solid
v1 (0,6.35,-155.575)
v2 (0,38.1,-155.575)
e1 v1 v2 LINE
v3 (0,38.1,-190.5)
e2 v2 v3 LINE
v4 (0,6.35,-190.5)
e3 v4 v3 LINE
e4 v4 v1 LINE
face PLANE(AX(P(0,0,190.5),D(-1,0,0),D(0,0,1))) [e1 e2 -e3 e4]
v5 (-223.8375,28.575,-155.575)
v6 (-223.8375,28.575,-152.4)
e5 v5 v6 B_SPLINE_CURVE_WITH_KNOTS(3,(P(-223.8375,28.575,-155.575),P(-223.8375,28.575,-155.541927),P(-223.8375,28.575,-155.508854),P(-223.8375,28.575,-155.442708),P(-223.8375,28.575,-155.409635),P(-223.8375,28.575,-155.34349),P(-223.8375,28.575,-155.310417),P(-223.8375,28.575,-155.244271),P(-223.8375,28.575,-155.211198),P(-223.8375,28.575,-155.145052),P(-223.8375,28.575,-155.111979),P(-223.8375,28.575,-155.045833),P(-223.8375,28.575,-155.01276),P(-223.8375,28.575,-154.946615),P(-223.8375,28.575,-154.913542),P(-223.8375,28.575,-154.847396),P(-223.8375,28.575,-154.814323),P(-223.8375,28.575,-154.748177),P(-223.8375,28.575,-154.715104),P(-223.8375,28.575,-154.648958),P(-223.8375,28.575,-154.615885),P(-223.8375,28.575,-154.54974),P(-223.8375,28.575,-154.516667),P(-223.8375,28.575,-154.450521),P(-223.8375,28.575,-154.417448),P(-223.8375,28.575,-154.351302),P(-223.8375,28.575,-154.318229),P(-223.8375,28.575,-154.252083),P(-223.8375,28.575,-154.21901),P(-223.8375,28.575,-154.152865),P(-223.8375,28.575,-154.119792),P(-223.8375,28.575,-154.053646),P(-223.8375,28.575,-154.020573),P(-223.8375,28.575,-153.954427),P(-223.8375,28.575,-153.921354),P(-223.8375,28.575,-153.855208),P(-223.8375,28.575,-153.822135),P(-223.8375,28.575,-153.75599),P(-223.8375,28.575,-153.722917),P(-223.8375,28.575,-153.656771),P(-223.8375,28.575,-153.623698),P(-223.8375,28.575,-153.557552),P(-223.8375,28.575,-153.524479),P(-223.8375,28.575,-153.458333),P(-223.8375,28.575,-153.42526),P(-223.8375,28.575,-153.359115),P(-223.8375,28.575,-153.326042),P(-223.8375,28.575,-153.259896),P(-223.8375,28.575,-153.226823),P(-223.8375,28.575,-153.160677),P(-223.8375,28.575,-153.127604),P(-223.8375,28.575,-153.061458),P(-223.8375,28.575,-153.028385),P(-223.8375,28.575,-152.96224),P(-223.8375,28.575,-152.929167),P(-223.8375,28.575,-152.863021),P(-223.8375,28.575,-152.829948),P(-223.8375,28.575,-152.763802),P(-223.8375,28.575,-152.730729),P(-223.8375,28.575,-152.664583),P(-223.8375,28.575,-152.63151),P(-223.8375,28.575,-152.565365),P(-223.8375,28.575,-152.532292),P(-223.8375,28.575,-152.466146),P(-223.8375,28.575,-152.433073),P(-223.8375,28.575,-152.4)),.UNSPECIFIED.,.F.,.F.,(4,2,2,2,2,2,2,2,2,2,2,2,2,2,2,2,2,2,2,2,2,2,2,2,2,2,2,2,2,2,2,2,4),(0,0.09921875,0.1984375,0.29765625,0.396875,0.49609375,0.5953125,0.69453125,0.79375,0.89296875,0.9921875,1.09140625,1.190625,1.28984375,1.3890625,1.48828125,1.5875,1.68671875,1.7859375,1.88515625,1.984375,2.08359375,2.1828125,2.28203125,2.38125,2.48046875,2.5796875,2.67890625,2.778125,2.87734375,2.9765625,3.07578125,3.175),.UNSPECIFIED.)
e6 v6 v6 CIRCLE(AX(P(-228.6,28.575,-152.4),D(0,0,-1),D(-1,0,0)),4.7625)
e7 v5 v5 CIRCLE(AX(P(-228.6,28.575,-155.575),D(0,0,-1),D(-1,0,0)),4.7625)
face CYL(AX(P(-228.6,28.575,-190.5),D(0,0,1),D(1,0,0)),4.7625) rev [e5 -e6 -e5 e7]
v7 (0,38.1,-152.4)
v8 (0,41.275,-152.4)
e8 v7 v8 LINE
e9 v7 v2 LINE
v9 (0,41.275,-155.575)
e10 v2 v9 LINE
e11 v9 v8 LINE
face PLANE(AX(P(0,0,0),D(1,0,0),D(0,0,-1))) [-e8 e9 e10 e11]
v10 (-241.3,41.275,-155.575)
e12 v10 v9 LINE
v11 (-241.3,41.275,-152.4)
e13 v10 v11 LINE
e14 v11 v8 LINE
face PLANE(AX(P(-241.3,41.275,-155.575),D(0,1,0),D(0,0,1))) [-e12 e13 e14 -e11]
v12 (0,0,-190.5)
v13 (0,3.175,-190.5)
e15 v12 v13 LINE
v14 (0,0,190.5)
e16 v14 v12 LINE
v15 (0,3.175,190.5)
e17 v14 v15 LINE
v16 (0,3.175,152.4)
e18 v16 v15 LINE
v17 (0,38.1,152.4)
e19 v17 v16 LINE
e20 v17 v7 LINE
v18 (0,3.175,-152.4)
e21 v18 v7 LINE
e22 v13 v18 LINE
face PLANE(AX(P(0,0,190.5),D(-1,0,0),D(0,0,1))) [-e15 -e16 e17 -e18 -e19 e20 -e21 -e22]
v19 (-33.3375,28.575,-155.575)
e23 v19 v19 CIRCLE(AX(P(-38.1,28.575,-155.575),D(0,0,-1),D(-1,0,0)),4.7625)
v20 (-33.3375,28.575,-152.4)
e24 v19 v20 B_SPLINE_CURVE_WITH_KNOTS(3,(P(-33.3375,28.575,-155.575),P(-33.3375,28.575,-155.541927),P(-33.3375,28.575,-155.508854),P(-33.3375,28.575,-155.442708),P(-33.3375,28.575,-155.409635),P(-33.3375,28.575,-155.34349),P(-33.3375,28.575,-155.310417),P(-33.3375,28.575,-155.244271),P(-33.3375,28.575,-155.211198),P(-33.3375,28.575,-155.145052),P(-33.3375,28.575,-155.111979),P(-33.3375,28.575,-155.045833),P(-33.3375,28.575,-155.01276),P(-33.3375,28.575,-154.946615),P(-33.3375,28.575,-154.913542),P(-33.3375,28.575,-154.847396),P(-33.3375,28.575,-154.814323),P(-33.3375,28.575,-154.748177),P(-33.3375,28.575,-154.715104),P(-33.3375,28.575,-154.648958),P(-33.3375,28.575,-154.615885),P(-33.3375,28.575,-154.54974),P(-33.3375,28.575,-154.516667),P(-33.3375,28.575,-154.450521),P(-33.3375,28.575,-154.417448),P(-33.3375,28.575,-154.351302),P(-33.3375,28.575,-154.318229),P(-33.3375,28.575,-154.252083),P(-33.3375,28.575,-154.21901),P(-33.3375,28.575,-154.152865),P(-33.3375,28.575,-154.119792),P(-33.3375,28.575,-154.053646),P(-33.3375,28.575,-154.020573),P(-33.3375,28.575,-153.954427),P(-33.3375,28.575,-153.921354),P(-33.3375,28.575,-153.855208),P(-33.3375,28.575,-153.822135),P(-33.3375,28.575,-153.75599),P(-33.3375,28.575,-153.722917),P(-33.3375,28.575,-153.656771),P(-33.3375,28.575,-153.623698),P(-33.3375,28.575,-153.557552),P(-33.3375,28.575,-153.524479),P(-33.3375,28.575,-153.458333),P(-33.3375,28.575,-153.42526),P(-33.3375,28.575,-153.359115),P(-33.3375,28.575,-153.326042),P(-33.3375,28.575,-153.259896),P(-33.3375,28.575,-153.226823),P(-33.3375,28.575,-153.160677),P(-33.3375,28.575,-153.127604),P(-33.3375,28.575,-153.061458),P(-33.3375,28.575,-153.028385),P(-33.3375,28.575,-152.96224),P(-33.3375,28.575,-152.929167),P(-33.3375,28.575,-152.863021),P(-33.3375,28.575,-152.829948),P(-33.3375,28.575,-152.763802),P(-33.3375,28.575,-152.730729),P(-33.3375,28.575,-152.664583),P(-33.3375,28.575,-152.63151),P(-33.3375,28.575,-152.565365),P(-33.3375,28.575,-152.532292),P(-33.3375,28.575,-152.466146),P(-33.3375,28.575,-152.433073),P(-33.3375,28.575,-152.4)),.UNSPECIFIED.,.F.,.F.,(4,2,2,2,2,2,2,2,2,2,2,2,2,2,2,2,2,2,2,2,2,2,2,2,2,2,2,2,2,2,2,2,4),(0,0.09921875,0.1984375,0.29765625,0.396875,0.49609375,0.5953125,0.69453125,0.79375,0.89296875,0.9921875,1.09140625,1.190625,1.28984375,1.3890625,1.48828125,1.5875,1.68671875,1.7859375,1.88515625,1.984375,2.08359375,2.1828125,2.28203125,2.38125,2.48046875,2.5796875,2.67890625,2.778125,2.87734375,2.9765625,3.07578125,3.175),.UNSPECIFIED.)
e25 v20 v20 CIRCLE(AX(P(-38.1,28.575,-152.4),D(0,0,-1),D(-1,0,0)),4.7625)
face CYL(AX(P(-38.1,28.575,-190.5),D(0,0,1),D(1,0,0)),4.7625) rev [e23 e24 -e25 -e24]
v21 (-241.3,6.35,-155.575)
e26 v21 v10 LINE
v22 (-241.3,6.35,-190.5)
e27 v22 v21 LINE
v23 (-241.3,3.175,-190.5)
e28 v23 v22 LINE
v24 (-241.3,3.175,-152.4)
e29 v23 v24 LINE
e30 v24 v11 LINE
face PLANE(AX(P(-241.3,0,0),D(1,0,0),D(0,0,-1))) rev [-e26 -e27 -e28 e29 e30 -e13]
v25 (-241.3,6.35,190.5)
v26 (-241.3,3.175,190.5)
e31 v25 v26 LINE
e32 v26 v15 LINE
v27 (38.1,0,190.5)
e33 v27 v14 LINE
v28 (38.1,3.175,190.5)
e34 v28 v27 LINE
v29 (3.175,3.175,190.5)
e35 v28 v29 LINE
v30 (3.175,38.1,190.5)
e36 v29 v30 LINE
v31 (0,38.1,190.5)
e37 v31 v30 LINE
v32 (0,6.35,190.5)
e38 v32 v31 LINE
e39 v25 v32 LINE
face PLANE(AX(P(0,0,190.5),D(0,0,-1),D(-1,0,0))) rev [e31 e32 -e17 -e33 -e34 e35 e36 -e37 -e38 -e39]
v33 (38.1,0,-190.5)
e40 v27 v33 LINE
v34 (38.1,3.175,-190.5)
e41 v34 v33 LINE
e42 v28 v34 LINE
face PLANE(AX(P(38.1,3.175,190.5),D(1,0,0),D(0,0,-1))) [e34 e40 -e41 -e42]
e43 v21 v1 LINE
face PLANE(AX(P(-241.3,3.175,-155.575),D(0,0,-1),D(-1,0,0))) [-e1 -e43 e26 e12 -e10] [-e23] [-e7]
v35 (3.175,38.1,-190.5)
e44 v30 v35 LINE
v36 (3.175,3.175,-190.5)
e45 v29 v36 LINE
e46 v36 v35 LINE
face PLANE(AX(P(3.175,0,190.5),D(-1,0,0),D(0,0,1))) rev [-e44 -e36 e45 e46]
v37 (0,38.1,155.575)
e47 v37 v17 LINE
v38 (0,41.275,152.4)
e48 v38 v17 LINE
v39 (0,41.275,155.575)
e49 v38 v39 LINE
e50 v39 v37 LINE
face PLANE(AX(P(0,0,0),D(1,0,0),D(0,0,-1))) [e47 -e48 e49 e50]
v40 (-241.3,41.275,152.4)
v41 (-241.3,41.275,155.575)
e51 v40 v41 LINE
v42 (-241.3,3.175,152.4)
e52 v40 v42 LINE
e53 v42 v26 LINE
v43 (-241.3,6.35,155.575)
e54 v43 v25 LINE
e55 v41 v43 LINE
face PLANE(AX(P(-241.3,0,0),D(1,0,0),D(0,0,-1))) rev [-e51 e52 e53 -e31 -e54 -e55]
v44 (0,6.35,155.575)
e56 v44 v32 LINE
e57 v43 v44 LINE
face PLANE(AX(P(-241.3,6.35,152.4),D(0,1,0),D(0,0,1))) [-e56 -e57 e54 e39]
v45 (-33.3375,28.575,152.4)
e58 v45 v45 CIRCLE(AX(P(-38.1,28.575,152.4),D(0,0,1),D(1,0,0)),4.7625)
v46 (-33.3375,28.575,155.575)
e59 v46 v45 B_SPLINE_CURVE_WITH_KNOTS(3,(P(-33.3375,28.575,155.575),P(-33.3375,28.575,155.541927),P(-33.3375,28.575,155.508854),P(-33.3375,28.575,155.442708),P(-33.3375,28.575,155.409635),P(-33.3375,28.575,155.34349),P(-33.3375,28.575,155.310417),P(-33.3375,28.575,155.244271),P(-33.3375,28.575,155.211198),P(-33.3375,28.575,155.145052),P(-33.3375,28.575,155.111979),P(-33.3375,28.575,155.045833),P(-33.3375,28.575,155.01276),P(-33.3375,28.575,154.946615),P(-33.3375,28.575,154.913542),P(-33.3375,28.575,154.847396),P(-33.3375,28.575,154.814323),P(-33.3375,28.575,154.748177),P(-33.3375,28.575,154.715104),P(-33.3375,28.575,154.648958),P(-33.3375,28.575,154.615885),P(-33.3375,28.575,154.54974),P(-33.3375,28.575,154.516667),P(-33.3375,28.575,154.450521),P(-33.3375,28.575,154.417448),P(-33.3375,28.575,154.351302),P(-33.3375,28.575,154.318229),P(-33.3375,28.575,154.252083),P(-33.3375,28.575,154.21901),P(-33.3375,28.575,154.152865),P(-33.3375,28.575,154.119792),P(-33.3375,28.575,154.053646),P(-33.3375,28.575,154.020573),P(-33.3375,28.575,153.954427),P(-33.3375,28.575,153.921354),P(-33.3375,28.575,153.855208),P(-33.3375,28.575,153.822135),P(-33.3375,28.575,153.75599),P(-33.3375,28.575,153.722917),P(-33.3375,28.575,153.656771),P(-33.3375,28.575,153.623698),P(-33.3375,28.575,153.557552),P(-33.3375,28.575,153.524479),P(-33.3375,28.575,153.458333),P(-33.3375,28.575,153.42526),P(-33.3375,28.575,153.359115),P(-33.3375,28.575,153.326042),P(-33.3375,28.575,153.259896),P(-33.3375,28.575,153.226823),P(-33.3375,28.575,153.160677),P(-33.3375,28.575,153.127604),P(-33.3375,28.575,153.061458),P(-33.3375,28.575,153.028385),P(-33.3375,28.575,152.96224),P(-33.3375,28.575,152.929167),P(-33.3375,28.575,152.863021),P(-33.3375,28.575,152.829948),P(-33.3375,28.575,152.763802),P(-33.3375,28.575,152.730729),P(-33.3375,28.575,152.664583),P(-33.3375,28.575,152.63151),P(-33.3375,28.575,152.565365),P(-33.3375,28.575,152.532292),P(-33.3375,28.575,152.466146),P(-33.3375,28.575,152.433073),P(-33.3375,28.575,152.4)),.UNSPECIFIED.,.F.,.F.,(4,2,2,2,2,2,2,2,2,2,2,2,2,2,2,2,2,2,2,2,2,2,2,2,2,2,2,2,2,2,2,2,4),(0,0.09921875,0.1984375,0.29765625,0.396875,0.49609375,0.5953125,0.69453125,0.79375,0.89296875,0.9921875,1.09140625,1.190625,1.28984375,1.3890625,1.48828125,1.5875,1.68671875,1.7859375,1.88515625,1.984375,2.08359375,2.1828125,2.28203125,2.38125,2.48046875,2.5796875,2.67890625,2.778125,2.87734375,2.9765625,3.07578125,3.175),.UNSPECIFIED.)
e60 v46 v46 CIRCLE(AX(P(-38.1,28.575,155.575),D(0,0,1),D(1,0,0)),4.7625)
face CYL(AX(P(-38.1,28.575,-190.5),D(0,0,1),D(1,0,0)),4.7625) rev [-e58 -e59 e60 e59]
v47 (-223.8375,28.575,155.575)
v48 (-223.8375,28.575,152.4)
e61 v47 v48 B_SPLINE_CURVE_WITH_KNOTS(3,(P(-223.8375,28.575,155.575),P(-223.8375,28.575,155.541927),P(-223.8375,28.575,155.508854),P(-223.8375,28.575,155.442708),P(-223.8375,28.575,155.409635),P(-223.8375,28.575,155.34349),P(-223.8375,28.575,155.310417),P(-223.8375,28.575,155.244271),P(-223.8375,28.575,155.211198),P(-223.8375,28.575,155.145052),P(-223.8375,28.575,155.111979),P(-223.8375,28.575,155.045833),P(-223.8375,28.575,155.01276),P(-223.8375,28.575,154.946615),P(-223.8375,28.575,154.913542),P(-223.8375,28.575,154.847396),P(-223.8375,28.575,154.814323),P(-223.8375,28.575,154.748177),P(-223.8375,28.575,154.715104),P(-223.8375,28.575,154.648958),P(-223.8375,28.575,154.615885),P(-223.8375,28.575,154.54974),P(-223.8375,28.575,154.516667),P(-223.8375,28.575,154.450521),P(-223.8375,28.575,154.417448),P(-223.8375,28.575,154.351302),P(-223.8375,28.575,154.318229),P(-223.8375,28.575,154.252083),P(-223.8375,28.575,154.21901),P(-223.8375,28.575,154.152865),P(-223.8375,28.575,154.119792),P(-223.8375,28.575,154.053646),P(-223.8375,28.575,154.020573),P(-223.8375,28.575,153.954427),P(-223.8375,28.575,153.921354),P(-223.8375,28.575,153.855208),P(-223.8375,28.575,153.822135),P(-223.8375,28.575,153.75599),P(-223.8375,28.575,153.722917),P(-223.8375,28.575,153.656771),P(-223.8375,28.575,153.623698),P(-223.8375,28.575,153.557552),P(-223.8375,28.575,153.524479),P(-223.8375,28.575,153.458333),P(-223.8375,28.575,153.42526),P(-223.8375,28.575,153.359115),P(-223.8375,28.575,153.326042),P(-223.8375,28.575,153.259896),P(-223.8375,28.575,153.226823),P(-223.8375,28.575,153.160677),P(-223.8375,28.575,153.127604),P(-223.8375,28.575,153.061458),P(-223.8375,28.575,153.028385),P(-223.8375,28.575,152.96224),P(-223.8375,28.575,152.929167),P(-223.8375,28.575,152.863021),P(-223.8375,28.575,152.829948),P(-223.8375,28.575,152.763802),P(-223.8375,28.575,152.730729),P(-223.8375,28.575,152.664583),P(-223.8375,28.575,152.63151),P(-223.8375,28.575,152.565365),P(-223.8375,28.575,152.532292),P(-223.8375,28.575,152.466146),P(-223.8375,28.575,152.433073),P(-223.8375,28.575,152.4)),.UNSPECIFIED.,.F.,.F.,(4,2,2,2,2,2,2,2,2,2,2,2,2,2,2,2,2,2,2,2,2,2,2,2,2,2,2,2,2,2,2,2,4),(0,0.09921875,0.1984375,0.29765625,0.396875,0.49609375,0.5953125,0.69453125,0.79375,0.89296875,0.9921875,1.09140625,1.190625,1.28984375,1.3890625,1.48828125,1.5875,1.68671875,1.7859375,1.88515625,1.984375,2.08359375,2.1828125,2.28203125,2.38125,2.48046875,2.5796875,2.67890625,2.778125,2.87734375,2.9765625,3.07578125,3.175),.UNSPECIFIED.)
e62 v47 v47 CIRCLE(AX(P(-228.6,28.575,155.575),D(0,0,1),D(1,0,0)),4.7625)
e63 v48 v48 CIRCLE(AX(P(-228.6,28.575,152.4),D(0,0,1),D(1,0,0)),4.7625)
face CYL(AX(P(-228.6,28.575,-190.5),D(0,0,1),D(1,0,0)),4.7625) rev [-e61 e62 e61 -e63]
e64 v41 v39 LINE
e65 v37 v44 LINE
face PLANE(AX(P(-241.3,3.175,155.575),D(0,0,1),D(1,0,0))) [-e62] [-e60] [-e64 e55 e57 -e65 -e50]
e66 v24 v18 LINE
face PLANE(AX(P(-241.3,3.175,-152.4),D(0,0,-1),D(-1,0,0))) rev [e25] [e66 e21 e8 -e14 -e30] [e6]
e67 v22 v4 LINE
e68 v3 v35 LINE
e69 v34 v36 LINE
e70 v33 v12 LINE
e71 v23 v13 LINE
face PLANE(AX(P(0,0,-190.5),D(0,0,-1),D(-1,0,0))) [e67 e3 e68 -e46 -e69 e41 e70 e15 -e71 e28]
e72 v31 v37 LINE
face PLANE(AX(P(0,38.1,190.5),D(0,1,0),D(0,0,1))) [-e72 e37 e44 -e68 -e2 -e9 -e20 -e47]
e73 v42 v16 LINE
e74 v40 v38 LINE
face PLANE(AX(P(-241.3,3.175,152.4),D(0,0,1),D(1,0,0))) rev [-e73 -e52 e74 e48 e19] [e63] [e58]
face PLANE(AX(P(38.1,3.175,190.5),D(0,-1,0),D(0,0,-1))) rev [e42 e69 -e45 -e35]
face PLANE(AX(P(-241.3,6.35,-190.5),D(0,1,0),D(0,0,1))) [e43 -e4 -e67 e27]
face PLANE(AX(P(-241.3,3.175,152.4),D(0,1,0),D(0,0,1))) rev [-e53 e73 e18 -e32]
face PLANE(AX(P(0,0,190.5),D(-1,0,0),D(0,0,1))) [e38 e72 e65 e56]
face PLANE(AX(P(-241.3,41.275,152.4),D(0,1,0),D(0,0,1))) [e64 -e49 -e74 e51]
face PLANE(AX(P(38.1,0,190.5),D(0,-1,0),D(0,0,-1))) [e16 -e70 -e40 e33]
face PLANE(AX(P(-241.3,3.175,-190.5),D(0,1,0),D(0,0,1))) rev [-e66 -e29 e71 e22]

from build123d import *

# Parameters (mm, degrees)
EXTRUDE_THIN1_DEPTH     = 190.5
EXTRUDE_THIN2_DEPTH     = 241.3
CUT_EXTRUDE3_DEPTH      = 311.192787835
CUT_EXTRUDE3_DEPTH_BACK = 311.192787835
SKETCH5_R               = 4.7625


with BuildPart() as part:
    # Sketch1 → Extrude-Thin1 (new, symmetric)
    with BuildSketch(Plane.XY):
        Polygon((38.1, 0), (0, 0), (0, 38.1), (3.175, 38.1), (3.175, 3.175), (38.1, 3.175), align=None)
    extrude(amount=EXTRUDE_THIN1_DEPTH, both=True)

    # Sketch2 → Extrude-Thin2 (add)
    with BuildSketch(Plane.ZY):
        Polygon((-190.5, 3.175), (-152.4, 3.175), (-152.4, 41.275), (-155.575, 41.275), (-155.575, 6.35), (-190.5, 6.35), align=None)
        Polygon((190.5, 3.175), (152.4, 3.175), (152.4, 41.275), (155.575, 41.275), (155.575, 6.35), (190.5, 6.35), align=None)
    extrude(amount=EXTRUDE_THIN2_DEPTH)

    # Sketch5 → Cut-Extrude3 (cut, two sides: drawn at the far end of the back side and taken through both)
    with BuildSketch(Plane.XY.offset(-CUT_EXTRUDE3_DEPTH_BACK)):
        with Locations((-228.6, 28.575)):
            Circle(SKETCH5_R)
        with Locations((-38.1, 28.575)):
            Circle(SKETCH5_R)
    extrude(amount=CUT_EXTRUDE3_DEPTH + CUT_EXTRUDE3_DEPTH_BACK, mode=Mode.SUBTRACT)


solid = part.part
